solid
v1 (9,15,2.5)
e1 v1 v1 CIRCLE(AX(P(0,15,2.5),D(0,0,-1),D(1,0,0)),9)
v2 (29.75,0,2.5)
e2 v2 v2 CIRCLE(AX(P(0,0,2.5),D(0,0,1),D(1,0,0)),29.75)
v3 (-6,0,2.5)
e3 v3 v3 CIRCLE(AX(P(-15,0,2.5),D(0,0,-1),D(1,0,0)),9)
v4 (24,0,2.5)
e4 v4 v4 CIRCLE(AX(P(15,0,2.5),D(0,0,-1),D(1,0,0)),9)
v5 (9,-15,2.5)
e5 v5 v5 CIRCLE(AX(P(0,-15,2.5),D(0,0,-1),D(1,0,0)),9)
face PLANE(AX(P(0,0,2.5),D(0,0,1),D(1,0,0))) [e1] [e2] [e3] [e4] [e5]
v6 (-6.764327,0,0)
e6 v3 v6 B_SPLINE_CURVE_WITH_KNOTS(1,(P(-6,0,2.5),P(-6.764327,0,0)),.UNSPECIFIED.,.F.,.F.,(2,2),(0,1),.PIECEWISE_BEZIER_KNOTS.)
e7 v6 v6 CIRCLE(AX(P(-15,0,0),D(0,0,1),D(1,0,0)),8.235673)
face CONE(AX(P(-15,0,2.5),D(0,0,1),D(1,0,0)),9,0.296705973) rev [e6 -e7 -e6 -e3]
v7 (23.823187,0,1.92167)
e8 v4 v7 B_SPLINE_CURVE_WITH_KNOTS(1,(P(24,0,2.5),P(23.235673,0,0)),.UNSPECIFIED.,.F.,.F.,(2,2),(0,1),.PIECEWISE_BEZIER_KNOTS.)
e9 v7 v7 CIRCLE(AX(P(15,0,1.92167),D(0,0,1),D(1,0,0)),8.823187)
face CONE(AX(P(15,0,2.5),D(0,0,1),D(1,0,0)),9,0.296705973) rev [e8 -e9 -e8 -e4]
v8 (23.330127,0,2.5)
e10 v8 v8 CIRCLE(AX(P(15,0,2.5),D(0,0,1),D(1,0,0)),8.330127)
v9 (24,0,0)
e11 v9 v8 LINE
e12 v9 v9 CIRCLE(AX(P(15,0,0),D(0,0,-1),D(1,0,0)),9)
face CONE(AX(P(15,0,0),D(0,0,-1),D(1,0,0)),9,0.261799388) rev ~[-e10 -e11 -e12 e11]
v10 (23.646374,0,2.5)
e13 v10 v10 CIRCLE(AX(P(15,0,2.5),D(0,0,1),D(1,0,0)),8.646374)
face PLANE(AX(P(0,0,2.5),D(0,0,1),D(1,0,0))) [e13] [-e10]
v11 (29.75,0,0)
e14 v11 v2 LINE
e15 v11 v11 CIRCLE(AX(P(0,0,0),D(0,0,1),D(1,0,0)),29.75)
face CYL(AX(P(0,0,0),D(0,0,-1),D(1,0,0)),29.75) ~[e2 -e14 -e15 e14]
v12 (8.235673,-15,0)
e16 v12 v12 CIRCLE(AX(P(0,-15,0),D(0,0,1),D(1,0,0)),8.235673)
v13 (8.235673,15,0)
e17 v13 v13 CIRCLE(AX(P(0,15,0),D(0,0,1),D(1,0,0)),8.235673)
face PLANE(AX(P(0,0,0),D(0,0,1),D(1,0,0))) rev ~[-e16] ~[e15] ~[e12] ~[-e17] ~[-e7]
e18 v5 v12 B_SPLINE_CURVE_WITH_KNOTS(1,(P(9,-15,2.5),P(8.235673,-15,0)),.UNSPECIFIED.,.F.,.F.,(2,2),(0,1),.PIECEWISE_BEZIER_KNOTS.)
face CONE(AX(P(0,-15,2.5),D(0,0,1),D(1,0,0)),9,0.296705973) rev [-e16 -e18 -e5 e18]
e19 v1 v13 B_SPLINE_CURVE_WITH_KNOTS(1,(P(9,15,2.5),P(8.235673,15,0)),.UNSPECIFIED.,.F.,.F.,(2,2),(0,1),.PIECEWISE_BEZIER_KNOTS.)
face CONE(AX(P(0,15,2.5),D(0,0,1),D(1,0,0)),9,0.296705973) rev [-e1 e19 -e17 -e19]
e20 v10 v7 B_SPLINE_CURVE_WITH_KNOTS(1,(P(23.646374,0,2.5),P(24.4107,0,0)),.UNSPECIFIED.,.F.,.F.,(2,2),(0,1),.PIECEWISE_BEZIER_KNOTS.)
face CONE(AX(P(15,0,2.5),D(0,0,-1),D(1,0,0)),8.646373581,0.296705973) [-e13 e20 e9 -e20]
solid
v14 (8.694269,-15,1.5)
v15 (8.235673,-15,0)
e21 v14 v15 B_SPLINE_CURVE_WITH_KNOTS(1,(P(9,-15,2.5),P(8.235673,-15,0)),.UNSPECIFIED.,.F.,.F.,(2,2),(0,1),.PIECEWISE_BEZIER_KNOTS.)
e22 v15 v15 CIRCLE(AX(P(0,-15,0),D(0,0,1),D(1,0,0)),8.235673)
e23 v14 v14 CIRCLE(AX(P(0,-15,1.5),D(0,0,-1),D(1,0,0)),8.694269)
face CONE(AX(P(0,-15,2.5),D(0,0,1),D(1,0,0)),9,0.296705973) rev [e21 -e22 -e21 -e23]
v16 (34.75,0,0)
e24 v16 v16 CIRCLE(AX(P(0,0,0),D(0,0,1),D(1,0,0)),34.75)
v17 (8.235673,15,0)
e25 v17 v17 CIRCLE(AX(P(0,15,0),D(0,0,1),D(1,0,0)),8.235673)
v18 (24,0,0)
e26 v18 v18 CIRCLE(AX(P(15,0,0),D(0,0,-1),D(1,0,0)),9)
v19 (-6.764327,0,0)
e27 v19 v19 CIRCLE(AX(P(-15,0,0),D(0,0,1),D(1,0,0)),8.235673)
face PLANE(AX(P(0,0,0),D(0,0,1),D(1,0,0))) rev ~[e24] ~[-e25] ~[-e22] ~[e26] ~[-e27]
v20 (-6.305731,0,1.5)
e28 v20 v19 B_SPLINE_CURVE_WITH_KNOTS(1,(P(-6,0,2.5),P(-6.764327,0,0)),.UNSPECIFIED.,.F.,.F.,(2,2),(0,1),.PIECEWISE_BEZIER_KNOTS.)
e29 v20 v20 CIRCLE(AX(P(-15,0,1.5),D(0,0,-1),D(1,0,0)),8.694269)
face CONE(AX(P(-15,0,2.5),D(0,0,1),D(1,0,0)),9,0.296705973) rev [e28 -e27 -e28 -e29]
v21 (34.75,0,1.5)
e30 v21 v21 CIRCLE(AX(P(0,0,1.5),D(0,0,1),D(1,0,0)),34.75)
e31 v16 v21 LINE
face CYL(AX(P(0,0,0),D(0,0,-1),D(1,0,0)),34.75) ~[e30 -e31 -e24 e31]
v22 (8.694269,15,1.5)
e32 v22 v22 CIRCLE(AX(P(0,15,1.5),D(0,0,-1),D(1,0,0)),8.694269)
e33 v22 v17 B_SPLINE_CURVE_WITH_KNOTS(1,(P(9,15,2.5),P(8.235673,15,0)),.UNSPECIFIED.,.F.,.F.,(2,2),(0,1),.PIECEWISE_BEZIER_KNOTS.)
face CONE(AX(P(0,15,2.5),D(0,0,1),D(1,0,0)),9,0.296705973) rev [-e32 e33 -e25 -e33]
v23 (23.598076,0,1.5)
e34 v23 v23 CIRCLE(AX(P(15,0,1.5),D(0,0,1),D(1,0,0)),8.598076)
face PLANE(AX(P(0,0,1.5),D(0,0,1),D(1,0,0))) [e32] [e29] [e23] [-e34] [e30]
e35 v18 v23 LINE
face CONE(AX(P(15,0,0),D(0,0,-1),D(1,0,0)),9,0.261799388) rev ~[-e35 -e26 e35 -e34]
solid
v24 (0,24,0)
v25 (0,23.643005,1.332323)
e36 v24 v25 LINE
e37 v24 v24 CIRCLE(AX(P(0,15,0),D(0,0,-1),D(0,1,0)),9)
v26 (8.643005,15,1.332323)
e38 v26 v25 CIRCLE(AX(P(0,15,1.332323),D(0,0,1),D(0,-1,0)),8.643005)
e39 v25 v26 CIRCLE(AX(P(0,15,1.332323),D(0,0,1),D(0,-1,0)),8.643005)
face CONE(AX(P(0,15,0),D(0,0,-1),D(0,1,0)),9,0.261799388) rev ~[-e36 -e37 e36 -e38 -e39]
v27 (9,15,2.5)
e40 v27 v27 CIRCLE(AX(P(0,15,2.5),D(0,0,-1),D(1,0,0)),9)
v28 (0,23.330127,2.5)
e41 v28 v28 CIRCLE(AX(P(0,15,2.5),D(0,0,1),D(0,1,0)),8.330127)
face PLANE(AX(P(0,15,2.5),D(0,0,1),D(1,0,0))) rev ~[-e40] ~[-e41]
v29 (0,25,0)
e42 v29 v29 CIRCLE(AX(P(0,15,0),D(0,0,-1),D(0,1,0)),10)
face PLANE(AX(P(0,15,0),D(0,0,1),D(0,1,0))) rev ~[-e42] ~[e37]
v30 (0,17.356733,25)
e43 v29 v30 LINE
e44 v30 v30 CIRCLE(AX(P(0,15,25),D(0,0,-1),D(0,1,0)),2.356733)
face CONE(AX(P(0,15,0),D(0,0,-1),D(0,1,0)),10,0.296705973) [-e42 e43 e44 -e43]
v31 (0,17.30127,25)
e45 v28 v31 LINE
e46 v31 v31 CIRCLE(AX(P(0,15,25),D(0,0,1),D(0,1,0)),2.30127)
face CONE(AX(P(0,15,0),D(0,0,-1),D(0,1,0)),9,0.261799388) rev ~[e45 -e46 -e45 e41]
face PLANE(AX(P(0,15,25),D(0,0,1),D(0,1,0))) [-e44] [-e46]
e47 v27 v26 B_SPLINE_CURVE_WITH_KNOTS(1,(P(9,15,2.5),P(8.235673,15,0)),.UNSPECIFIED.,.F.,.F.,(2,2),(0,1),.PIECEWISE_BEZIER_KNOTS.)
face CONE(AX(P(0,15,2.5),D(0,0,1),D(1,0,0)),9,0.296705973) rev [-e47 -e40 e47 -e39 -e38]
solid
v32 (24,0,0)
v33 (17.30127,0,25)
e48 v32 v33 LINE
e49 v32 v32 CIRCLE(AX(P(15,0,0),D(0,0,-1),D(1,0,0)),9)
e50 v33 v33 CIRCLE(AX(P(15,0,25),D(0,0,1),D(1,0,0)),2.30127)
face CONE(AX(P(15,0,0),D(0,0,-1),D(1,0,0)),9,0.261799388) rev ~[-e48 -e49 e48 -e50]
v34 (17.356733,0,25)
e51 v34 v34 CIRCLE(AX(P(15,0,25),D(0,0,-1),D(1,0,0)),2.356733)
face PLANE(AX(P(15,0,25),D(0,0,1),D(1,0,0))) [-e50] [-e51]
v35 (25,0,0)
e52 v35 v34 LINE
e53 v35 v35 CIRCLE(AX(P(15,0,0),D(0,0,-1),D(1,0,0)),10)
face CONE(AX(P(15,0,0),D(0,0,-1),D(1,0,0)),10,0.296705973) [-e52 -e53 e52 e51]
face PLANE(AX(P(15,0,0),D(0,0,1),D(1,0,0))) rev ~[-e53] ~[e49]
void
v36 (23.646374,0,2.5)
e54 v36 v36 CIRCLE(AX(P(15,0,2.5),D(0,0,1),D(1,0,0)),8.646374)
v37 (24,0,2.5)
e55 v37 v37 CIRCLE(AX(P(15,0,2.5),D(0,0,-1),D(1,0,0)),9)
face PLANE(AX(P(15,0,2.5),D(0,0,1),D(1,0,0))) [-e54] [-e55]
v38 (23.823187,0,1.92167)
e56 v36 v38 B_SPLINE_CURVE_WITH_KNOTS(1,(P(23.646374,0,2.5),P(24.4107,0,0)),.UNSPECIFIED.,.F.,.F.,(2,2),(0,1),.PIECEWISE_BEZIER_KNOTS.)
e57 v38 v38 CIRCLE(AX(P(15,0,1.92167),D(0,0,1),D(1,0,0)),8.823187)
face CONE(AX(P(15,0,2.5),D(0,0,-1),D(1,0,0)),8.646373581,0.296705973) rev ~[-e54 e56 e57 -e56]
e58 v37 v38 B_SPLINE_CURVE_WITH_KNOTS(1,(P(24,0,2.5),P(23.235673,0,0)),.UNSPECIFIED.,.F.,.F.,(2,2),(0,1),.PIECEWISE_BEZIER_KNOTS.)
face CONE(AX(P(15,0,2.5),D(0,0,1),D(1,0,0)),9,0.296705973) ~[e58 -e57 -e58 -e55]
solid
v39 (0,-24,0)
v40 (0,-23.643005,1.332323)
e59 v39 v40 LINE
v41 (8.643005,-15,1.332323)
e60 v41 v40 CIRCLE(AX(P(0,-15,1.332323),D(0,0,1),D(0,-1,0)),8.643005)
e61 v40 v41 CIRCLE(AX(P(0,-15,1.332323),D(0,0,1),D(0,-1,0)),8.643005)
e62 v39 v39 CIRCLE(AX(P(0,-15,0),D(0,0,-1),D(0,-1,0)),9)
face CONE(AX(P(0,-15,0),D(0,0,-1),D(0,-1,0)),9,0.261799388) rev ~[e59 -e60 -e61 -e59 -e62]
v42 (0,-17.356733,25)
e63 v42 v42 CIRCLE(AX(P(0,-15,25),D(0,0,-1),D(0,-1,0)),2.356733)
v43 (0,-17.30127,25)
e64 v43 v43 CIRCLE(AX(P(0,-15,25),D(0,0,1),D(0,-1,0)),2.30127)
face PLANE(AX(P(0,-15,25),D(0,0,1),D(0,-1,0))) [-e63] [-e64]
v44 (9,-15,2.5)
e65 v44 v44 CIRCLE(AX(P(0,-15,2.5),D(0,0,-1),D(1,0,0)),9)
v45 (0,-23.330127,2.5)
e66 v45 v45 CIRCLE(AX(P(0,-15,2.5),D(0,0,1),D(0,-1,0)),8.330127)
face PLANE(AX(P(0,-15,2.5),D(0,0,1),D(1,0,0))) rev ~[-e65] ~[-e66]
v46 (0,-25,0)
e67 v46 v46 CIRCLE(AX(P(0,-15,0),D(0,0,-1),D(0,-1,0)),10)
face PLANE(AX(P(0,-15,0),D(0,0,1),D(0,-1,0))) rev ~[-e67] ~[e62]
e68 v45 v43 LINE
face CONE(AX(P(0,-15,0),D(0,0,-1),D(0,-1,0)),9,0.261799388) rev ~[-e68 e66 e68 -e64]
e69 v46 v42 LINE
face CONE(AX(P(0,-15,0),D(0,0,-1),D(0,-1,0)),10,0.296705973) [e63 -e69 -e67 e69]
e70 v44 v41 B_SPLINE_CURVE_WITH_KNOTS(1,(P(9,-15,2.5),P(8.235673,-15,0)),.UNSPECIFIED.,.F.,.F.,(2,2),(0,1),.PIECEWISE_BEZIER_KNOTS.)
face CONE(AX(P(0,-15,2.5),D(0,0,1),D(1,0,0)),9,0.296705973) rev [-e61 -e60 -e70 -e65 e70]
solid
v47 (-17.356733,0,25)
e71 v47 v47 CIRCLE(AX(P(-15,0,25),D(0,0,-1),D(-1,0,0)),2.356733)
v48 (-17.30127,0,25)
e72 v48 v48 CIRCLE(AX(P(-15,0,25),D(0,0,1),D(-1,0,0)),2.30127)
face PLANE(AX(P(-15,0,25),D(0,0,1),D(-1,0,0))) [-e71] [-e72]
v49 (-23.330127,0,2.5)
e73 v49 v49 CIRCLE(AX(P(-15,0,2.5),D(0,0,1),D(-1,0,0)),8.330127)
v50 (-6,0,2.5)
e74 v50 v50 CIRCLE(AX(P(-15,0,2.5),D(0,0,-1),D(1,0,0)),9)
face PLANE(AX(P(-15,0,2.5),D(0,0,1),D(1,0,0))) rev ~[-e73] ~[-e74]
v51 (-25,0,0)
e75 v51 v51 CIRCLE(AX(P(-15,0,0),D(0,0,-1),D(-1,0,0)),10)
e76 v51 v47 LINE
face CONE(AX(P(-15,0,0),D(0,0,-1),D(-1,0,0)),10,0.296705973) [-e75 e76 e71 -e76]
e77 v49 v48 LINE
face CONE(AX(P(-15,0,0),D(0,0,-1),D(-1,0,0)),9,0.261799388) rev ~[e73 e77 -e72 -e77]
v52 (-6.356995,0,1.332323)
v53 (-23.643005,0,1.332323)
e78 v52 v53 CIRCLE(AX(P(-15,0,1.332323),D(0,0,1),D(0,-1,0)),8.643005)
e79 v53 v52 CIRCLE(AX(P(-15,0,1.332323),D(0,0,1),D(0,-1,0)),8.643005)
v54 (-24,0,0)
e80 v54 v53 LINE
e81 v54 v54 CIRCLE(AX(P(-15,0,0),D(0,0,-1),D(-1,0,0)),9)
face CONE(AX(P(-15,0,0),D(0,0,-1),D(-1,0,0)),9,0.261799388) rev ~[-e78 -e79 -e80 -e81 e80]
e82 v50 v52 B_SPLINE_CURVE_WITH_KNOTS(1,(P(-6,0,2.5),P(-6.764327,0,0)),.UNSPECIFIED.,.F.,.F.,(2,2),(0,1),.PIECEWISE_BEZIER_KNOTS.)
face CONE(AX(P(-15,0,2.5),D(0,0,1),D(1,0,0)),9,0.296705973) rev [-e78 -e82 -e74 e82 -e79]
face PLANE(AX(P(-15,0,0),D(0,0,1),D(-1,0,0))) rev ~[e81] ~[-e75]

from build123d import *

# Parameters (mm, degrees)
F1_R      = 10
F3_DEPTH  = 25
F3_TAPER  = 17
F2_R      = 29.75
F5_DEPTH  = 2.5
F0_R      = 34.75
F6_DEPTH  = 1.5
F4_R      = 9
F7_DEPTH  = 25.001
F7_TAPER  = 15
F8_COUNT  = 4
F9_R      = 9
F9_R_2    = 8.6463735814
F10_DEPTH = 2.5
F10_TAPER = 17


# Not quite as in the source:
# - a feature names something its author has since deleted; it is built from what else it names


with BuildPart() as f3:
    # F1 (on Top) → F3 (new body)
    with BuildSketch(Plane.XY):
        with Locations((15, 0)):
            Circle(F1_R)
    extrude(amount=F3_DEPTH, taper=F3_TAPER)


with BuildPart() as f5:
    # F2 (on Top) → F5 (new body)
    with BuildSketch(Plane.XY):
        Circle(F2_R)
    extrude(amount=F5_DEPTH)


with BuildPart() as f6:
    # F0 (on Top) → F6 (new body)
    with BuildSketch(Plane.XY):
        Circle(F0_R)
    extrude(amount=F6_DEPTH)


with BuildPart() as f7_tool:
    # F4 (on Top) → F7 (new body, through all)
    with BuildSketch(Plane.XY):
        with Locations((15, 0)):
            Circle(F4_R)
    extrude(amount=F7_DEPTH, taper=F7_TAPER)


with BuildPart() as f3_1:
    add(f3.part)

    # F7: cut by f7_tool
    add(f7_tool.part, mode=Mode.SUBTRACT)


with BuildPart() as f5_1:
    add(f5.part)

    # F7: cut by f7_tool
    add(f7_tool.part, mode=Mode.SUBTRACT)


with BuildPart() as f6_1:
    add(f6.part)

    # F7: cut by f7_tool
    add(f7_tool.part, mode=Mode.SUBTRACT)


with BuildPart() as f8_1:
    # F8: instance of F3
    add(f3_1.part.rotate(Axis((0, 0, 0), (0, 0, 1)), 1 * 360 / F8_COUNT))


with BuildPart() as f8_2:
    # F8: instance of F3
    add(f3_1.part.rotate(Axis((0, 0, 0), (0, 0, 1)), 2 * 360 / F8_COUNT))


with BuildPart() as f8_3:
    # F8: instance of F3
    add(f3_1.part.rotate(Axis((0, 0, 0), (0, 0, 1)), 3 * 360 / F8_COUNT))


with BuildPart() as f10_tool:
    # F9 (on face) → F10 (new body)
    with BuildSketch(Plane.XY.offset(2.5)):
        with Locations((0, -15)):
            Circle(F9_R)
        with Locations((15, 0)):
            Circle(F9_R)
        with Locations((15, 0)):
            Circle(F9_R_2, mode=Mode.SUBTRACT)
        with Locations((0, 15)):
            Circle(F9_R)
        with Locations((-15, 0)):
            Circle(F9_R)
    extrude(amount=-F10_DEPTH, taper=F10_TAPER)


with BuildPart() as f3_2:
    add(f3_1.part)

    # F10: cut by f10_tool
    add(f10_tool.part, mode=Mode.SUBTRACT)


with BuildPart() as f5_2:
    add(f5_1.part)

    # F10: cut by f10_tool
    add(f10_tool.part, mode=Mode.SUBTRACT)


with BuildPart() as f6_2:
    add(f6_1.part)

    # F10: cut by f10_tool
    add(f10_tool.part, mode=Mode.SUBTRACT)


with BuildPart() as f8_1_1:
    add(f8_1.part)

    # F10: cut by f10_tool
    add(f10_tool.part, mode=Mode.SUBTRACT)


with BuildPart() as f8_2_1:
    add(f8_2.part)

    # F10: cut by f10_tool
    add(f10_tool.part, mode=Mode.SUBTRACT)


with BuildPart() as f8_3_1:
    add(f8_3.part)

    # F10: cut by f10_tool
    add(f10_tool.part, mode=Mode.SUBTRACT)


solid = Compound([f3_2.part, f5_2.part, f6_2.part, f8_1_1.part, f8_2_1.part, f8_3_1.part])
